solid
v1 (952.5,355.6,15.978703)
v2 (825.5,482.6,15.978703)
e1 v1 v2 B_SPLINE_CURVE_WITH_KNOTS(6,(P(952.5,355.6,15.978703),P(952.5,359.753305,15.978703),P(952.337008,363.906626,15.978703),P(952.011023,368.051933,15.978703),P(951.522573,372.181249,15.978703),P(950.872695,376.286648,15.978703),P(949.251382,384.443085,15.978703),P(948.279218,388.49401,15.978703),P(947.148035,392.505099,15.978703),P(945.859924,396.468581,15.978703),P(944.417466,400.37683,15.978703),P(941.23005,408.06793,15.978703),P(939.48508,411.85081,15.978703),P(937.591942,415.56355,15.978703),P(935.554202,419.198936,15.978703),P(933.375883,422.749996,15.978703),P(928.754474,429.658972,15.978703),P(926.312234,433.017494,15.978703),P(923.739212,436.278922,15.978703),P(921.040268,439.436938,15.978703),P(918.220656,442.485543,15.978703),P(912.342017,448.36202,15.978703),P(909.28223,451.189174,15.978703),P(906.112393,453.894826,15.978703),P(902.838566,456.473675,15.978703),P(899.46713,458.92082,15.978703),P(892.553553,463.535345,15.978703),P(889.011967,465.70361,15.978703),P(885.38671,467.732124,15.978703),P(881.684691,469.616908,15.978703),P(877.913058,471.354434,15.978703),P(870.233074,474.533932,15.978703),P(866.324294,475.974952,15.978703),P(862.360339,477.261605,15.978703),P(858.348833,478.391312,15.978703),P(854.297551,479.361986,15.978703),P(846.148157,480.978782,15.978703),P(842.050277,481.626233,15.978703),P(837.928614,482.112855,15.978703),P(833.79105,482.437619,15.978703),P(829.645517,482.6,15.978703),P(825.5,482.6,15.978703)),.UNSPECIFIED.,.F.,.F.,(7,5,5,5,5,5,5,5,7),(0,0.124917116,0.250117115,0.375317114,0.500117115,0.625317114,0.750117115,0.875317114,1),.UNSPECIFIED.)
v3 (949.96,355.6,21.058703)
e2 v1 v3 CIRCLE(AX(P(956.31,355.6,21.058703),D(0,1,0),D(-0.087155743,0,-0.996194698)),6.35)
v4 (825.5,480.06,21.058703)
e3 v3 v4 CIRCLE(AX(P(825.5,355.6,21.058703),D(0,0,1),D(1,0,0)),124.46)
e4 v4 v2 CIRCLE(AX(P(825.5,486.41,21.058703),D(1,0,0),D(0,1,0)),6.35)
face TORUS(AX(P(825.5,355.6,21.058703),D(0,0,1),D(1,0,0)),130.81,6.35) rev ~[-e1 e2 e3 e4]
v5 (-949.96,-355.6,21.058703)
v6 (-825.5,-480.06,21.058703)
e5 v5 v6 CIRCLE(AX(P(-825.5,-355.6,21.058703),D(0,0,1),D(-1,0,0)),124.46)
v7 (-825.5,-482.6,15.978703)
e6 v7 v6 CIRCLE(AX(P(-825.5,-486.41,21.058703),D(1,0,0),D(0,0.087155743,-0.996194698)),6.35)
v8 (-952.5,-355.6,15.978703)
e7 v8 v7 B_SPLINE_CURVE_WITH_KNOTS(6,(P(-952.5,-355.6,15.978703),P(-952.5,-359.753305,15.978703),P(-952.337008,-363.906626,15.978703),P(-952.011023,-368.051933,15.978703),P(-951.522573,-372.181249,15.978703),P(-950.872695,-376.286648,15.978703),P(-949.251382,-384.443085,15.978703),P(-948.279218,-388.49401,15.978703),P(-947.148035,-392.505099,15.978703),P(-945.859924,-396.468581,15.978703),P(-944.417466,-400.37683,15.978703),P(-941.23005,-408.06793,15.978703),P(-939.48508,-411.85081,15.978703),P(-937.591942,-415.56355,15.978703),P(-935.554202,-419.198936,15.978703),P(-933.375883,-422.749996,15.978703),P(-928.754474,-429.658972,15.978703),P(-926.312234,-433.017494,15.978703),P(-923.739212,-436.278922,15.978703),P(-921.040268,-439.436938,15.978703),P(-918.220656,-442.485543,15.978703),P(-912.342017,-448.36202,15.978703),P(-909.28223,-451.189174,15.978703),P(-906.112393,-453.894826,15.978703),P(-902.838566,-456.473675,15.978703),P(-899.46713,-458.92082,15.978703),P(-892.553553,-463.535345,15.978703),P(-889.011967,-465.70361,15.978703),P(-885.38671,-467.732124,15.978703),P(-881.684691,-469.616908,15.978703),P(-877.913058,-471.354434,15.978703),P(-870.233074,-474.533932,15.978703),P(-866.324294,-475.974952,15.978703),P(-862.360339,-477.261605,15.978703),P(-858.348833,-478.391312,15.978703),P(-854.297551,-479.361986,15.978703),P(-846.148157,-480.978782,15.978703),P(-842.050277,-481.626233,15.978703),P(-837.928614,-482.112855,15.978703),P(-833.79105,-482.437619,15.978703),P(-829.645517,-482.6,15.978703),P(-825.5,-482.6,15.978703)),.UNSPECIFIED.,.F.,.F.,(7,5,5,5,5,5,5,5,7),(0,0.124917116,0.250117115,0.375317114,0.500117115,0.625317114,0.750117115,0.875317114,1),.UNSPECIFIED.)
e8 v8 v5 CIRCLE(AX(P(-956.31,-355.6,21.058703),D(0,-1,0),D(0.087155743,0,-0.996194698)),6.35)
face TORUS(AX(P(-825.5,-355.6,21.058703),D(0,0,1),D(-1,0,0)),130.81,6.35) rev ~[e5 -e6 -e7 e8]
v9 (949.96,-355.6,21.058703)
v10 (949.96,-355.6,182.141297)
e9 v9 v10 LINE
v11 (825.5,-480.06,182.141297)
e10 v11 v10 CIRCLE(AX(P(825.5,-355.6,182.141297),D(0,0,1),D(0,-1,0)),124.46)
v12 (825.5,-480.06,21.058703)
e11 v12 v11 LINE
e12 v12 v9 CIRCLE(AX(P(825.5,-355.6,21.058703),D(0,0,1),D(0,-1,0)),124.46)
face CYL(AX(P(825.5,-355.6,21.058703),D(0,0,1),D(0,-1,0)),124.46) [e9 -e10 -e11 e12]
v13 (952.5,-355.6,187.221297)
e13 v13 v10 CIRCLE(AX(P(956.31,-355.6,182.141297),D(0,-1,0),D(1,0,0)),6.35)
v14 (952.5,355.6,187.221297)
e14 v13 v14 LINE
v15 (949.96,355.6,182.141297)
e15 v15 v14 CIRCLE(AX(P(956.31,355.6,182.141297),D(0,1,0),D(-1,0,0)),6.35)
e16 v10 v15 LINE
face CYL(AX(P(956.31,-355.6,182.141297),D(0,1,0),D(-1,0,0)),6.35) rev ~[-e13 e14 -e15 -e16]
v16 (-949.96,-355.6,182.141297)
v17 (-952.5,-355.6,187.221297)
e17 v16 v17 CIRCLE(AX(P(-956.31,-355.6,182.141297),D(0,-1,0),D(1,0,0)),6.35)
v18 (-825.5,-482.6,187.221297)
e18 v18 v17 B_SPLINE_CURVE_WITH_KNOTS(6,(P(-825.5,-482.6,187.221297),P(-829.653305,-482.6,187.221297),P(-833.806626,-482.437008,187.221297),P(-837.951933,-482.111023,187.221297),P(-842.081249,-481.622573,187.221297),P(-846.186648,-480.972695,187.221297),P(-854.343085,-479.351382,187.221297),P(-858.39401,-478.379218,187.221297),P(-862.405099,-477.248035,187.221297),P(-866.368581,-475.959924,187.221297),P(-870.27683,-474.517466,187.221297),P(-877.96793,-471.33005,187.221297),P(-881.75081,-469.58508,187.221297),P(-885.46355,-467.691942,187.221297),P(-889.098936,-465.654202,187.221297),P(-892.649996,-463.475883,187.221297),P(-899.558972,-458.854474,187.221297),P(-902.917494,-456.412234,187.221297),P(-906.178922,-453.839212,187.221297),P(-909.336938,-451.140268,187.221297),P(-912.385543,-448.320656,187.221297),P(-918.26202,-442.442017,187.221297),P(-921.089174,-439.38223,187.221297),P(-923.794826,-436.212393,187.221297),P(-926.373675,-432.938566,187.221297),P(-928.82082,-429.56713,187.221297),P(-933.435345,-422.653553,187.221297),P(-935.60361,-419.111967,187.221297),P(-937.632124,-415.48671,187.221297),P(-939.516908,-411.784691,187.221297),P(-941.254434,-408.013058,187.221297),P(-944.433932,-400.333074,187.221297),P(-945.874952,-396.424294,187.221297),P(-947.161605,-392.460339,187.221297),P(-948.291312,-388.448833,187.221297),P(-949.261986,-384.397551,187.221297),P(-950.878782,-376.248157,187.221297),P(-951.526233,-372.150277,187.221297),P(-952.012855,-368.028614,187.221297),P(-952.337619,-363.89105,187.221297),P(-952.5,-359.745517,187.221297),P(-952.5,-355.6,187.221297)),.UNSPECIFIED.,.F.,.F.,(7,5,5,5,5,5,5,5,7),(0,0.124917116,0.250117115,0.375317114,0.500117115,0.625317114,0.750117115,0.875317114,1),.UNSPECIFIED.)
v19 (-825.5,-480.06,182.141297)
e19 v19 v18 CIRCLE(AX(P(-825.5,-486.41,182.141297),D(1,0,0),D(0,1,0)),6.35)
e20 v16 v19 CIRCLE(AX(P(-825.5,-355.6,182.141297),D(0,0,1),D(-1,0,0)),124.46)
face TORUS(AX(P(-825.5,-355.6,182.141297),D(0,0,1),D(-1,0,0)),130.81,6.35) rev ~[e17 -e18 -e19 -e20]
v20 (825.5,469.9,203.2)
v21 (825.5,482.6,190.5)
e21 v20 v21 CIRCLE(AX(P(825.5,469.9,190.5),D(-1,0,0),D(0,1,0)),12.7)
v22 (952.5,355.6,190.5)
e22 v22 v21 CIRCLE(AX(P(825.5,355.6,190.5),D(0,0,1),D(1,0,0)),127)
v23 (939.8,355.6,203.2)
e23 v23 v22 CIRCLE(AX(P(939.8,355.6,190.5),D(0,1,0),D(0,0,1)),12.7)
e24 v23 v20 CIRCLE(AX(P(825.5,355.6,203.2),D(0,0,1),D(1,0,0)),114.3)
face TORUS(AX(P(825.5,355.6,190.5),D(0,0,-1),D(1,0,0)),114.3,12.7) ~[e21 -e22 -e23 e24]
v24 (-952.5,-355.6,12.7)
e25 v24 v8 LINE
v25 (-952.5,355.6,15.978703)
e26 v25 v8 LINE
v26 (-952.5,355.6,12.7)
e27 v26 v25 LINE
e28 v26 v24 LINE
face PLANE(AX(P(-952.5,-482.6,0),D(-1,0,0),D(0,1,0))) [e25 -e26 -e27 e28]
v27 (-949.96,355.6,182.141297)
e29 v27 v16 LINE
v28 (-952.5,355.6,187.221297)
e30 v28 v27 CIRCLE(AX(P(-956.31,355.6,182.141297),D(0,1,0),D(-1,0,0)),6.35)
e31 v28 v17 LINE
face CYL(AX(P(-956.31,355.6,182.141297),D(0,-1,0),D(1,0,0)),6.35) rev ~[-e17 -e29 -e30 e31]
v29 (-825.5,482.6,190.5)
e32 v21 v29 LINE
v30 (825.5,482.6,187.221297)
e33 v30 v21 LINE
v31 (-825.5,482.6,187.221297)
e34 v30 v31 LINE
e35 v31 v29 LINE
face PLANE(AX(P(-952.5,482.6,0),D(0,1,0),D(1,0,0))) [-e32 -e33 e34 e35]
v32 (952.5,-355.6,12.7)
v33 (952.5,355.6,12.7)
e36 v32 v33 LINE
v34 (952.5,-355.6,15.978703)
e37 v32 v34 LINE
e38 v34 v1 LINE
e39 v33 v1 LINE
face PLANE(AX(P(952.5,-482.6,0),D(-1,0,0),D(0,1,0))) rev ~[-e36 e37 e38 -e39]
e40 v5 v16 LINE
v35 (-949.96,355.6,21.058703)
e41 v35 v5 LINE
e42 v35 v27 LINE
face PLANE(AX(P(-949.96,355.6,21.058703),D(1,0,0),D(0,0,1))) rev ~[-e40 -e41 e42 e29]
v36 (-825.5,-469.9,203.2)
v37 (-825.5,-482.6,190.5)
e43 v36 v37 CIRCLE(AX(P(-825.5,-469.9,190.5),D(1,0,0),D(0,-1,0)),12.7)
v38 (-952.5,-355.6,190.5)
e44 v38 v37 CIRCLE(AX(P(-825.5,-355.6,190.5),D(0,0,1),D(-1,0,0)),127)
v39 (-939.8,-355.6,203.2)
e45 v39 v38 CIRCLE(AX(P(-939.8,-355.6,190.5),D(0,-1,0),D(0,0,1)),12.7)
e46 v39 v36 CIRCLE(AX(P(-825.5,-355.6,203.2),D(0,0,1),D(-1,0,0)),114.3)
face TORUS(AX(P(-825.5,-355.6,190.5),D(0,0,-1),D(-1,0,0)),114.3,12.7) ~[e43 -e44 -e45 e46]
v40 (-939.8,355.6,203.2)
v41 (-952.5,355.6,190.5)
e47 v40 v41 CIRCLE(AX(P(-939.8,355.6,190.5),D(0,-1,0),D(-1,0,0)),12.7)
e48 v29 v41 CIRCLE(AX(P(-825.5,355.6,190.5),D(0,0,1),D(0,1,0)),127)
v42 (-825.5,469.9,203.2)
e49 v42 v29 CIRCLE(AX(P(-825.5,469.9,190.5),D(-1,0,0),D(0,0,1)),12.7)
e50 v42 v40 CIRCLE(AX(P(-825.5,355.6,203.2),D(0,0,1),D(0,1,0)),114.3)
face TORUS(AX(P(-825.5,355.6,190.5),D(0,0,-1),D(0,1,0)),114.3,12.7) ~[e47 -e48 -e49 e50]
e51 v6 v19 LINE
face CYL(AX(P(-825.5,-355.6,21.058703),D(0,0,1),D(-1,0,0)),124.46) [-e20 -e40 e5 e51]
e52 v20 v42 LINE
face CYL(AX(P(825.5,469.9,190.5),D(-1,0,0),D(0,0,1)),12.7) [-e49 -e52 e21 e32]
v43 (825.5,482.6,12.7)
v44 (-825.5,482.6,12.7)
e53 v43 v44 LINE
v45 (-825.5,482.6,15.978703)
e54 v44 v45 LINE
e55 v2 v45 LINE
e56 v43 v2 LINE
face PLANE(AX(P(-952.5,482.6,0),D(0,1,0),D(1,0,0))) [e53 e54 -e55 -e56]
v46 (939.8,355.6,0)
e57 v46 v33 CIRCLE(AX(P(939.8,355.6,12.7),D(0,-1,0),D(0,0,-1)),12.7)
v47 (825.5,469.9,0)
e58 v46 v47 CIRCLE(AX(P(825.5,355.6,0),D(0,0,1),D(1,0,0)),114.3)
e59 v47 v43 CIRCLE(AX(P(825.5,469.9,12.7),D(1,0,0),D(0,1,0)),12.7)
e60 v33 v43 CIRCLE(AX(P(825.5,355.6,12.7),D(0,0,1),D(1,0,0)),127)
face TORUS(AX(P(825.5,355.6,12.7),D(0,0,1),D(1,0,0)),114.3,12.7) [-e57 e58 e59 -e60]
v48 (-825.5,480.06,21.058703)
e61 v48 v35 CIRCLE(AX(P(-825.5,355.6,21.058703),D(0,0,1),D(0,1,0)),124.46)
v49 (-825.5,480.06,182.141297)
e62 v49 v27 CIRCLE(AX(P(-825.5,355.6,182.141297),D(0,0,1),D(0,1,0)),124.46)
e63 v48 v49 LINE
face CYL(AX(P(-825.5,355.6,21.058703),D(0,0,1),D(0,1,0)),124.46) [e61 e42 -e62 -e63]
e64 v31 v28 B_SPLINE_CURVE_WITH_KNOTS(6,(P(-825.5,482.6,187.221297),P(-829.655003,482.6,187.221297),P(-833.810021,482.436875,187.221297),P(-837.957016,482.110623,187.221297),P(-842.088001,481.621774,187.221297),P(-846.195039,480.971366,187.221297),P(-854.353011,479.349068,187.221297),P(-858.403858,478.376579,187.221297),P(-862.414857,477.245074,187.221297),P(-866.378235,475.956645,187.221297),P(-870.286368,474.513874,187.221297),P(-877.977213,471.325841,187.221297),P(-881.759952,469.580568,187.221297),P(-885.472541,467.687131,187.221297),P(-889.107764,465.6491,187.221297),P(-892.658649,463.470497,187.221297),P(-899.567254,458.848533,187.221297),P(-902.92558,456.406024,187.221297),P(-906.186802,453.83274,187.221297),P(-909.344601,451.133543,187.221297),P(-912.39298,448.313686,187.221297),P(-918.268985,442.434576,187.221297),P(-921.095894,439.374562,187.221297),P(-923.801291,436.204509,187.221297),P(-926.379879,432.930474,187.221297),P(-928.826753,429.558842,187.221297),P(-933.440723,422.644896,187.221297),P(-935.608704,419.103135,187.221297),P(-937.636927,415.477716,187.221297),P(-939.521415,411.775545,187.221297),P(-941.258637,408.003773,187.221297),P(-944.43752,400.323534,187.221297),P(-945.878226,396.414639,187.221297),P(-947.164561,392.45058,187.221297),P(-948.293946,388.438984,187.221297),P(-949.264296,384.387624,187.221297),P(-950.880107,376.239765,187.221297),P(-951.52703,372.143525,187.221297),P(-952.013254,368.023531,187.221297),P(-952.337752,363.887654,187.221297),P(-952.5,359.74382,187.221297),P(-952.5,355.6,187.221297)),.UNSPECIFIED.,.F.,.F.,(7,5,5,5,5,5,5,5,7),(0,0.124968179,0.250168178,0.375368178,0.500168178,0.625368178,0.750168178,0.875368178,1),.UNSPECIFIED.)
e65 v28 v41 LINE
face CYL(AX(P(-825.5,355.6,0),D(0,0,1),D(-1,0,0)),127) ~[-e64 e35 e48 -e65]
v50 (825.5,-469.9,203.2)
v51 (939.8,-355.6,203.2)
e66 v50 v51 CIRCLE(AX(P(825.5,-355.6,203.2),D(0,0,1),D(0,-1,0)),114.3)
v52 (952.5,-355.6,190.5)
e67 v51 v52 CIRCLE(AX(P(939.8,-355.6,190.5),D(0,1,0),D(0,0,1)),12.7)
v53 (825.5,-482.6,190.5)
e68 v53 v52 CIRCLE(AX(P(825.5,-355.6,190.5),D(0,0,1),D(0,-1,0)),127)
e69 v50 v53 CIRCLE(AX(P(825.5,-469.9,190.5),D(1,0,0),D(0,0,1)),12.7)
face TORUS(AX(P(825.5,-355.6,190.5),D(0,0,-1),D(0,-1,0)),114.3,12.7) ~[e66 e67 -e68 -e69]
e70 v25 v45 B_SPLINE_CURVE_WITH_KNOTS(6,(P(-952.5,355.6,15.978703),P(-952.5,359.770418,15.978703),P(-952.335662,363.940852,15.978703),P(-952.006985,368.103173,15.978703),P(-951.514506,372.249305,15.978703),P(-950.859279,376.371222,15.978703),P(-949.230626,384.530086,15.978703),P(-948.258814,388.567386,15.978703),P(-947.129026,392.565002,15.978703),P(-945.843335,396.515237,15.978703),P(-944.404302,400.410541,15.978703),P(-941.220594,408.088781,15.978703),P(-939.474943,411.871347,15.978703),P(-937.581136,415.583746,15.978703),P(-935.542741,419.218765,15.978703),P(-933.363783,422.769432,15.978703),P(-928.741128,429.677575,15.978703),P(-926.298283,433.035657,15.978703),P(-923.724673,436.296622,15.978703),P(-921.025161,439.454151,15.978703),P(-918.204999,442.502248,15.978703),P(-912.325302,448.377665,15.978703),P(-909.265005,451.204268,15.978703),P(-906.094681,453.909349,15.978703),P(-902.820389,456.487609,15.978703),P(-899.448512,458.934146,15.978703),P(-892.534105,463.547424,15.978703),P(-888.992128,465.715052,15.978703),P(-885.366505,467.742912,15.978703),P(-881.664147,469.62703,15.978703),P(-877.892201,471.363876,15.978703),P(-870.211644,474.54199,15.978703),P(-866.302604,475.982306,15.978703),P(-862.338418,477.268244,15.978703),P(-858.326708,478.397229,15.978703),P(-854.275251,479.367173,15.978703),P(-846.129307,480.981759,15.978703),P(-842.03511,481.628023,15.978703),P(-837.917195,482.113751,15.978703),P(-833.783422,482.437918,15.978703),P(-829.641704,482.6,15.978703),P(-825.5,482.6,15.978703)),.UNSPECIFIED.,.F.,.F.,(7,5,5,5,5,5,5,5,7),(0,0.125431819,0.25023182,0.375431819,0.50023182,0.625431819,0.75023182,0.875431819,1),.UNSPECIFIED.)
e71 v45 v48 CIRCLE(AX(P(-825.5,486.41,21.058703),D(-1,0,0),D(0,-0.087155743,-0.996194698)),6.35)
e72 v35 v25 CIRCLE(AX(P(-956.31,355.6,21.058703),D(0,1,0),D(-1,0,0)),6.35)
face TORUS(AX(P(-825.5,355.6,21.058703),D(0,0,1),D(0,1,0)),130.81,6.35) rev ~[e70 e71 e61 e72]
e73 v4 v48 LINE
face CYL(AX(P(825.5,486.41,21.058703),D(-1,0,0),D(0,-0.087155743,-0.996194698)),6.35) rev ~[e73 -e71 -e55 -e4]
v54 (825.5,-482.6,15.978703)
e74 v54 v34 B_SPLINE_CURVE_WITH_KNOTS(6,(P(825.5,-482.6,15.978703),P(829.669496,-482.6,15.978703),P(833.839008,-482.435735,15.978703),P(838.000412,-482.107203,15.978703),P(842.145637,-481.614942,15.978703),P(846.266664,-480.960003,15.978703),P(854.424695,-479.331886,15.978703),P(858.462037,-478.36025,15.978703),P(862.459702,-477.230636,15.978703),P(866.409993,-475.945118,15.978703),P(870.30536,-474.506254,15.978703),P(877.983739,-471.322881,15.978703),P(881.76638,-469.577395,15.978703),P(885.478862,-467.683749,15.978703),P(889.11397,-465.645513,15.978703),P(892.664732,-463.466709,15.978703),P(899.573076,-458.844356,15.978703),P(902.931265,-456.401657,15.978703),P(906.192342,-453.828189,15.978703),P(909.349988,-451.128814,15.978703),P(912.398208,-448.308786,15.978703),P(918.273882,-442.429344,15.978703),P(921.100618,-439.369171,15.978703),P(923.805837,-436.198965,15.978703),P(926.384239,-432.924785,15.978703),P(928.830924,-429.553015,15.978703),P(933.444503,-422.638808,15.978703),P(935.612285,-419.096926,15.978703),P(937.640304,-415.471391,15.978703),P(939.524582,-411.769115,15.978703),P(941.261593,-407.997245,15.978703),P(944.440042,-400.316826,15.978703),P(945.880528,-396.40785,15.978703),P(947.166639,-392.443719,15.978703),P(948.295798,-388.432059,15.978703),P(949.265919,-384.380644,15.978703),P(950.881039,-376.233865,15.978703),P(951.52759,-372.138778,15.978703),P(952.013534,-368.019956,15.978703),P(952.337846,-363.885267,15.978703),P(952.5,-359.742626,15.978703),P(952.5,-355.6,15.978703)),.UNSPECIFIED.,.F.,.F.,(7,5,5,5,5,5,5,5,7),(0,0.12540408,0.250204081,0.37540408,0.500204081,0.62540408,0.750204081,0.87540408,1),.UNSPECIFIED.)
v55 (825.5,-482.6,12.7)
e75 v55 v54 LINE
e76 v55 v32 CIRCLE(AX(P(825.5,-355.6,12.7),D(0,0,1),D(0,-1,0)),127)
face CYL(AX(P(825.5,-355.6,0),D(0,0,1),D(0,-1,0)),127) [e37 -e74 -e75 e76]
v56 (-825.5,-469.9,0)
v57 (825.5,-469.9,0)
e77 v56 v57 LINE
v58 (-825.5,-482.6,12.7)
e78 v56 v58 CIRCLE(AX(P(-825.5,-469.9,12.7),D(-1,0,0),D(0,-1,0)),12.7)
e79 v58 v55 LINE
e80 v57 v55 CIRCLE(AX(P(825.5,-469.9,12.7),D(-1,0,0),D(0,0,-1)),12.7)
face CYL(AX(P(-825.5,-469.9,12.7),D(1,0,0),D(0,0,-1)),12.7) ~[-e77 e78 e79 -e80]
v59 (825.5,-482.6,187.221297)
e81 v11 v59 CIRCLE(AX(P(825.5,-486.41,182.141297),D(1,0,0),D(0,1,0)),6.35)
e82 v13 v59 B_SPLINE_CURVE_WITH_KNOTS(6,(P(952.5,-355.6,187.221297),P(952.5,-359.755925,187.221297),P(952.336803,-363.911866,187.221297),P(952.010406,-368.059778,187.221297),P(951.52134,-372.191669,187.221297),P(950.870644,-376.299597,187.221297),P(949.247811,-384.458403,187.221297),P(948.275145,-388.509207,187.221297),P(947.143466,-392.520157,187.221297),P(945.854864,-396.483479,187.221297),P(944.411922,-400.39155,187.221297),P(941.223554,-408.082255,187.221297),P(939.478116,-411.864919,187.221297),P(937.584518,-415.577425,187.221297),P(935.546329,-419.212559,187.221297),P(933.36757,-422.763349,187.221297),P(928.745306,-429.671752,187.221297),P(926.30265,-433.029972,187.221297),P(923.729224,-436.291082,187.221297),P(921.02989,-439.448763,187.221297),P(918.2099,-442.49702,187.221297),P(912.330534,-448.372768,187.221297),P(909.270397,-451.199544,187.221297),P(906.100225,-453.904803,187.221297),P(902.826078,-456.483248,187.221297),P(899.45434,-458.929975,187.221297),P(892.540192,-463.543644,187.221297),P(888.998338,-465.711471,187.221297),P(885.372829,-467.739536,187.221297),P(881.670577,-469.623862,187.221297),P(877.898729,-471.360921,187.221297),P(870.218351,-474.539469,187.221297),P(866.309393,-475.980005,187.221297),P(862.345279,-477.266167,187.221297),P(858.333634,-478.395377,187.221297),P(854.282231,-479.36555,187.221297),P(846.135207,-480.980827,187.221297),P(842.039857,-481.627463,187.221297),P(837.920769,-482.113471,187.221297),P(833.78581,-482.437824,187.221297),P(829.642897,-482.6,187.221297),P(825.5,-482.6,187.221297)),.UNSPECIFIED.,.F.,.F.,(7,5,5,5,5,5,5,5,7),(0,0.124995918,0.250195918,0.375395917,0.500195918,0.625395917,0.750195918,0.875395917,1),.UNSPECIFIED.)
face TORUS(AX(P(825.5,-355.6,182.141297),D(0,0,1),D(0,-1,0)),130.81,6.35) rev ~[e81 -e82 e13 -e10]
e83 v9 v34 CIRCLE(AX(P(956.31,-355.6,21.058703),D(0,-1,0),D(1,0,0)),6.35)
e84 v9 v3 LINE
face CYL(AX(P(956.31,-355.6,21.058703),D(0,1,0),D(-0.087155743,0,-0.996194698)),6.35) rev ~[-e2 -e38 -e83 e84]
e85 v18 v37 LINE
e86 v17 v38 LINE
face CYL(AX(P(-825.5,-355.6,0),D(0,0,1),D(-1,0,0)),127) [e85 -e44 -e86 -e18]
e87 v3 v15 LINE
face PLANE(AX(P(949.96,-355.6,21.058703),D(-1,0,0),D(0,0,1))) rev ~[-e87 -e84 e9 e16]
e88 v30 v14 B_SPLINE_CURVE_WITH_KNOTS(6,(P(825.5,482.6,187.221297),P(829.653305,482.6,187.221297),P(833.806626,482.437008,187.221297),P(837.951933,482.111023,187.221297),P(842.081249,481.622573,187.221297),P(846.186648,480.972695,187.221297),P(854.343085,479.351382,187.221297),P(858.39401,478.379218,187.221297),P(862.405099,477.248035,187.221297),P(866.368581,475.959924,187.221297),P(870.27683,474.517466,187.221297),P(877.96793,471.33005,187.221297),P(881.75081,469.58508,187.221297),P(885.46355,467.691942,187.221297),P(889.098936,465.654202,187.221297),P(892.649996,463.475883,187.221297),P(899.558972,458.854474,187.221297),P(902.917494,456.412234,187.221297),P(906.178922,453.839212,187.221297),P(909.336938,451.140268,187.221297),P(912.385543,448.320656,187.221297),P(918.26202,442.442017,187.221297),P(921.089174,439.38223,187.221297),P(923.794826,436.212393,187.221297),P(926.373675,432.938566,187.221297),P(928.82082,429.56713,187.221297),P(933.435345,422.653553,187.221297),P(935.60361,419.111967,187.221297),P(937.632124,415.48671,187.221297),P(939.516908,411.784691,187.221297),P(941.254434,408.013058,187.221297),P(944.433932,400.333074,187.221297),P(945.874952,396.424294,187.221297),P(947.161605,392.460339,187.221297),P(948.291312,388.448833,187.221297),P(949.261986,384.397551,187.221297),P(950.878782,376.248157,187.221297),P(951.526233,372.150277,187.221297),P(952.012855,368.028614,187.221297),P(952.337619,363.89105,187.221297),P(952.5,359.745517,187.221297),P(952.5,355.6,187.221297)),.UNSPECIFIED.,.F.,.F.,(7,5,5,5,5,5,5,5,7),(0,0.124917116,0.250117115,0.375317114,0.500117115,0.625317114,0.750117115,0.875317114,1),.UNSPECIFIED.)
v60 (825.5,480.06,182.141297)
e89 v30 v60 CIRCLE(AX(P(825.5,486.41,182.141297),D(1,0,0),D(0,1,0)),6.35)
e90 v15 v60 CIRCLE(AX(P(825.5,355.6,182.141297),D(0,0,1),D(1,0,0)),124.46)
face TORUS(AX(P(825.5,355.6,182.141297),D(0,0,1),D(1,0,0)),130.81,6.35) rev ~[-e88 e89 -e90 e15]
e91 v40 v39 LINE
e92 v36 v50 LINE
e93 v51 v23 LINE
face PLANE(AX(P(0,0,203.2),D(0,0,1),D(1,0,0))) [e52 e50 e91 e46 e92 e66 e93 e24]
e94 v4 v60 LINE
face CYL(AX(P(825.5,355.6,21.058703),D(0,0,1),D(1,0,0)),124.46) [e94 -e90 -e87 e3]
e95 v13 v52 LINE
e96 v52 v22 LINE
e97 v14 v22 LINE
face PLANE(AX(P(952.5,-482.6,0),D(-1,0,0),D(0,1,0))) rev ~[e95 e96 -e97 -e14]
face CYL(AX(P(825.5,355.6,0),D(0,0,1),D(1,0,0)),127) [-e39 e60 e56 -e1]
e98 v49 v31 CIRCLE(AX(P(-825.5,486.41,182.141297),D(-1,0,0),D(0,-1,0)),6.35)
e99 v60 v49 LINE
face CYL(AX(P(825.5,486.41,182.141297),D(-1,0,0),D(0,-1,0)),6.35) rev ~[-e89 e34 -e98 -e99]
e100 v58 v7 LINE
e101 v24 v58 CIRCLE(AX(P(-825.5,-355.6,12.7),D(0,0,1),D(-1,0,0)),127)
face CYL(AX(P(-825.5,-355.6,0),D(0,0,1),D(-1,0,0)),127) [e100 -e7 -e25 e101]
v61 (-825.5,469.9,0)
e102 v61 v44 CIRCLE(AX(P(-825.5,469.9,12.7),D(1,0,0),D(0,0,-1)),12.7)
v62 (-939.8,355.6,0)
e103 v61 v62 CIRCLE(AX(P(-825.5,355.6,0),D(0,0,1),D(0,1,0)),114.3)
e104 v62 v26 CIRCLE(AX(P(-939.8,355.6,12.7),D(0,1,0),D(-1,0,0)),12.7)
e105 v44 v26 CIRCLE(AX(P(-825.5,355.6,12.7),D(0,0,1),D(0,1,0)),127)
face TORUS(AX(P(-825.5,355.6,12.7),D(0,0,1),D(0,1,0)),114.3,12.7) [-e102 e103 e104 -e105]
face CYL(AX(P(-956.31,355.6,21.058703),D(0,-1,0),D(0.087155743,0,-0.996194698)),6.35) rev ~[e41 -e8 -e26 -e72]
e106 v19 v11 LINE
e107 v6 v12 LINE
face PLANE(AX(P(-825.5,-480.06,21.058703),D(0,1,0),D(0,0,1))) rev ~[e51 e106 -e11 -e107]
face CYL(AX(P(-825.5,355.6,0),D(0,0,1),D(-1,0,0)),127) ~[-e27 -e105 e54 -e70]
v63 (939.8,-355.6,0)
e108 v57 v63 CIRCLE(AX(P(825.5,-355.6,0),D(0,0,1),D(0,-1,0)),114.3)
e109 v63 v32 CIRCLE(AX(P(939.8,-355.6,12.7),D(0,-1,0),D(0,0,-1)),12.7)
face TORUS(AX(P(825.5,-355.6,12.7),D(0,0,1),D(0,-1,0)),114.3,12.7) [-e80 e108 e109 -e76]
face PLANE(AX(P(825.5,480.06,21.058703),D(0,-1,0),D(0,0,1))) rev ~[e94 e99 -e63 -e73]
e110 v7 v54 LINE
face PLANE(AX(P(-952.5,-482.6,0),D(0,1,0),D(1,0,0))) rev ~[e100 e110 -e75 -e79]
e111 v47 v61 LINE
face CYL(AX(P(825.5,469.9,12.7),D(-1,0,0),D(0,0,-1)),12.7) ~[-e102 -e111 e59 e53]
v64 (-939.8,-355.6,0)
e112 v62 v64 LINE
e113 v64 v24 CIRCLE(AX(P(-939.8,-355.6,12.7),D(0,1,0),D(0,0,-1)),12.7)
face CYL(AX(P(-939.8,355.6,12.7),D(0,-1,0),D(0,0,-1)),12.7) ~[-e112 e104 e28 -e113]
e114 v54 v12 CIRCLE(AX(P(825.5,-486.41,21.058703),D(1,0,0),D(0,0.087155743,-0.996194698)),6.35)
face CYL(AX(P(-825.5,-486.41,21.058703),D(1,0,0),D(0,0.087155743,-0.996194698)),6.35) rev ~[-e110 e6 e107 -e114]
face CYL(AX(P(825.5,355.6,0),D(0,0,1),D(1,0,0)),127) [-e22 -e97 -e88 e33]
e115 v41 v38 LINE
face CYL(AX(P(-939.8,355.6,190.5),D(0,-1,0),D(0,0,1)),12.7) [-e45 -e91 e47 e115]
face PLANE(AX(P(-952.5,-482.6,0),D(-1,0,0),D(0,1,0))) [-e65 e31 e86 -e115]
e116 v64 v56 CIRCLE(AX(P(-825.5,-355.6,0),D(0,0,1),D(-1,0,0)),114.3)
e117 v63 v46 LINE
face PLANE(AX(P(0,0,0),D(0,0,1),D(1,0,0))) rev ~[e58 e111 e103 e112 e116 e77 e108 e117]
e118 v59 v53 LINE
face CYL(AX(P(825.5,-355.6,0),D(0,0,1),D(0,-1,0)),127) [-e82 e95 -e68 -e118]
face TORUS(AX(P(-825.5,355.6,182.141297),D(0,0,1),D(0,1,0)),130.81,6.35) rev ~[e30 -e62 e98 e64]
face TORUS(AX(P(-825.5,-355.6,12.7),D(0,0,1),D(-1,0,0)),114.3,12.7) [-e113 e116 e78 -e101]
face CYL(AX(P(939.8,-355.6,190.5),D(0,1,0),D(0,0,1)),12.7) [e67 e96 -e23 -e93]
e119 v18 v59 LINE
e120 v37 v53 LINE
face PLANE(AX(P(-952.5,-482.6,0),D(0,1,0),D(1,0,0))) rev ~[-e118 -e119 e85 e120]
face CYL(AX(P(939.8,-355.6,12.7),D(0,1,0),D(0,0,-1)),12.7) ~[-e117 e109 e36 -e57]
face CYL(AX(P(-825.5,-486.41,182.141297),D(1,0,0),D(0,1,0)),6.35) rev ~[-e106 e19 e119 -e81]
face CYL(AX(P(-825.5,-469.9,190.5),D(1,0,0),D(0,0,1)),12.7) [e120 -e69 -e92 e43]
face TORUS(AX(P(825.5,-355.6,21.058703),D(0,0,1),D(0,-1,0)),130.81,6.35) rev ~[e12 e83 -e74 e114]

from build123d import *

# Parameters (mm, degrees)
F0_W     = 1905
F0_H     = 965.2
F1_DEPTH = 203.2
F2_R     = 127
F3_R     = 12.7


with BuildPart() as f1:
    # F0 (on Top) → F1 (new body)
    with BuildSketch(Plane.XY):
        Rectangle(F0_W, F0_H)
    extrude(amount=F1_DEPTH)

    # F2
    f2_edges = [f1.edges().sort_by_distance(p)[0] for p in [
        (952.5, -482.6, 101.6),
        (-952.5, -482.6, 101.6),
        (952.5, 482.6, 101.6),
        (-952.5, 482.6, 101.6),
    ]]
    fillet(f2_edges, radius=F2_R)

    # F3
    f3_edges = [f1.edges().sort_by_distance(p)[0] for p in [
        (952.5, 0, 203.2),
        (915.302561, -445.402561, 203.2),
        (915.302561, 445.402561, 203.2),
        (0, -482.6, 203.2),
        (0, 482.6, 203.2),
        (-915.302561, -445.402561, 203.2),
        (-915.302561, 445.402561, 203.2),
        (-952.5, 0, 203.2),
        (952.5, 0, 0),
        (915.302561, -445.402561, 0),
        (915.302561, 445.402561, 0),
        (0, -482.6, 0),
        (0, 482.6, 0),
        (-915.302561, -445.402561, 0),
        (-915.302561, 445.402561, 0),
        (-952.5, 0, 0),
    ]]
    fillet(f3_edges, radius=F3_R)

    # F7: sweep along a path in F7_path
    with BuildLine(Plane(origin=(-825.5, -482.6, 190.5), x_dir=(0, 1, 0), z_dir=(0, 0, 1))) as f7_path:
        Line((0, 0), (0, -1651))
        ThreePointArc((0, -1651), (37.1974387893, -1740.8025612107), (127, -1778))
        Line((127, -1778), (838.2, -1778))
        ThreePointArc((838.2, -1778), (928.0025612107, -1740.8025612107), (965.2, -1651))
        Line((965.2, -1651), (965.2, 0))
        ThreePointArc((965.2, 0), (928.0025612107, 89.8025612107), (838.2, 127))
        Line((838.2, 127), (127, 127))
        ThreePointArc((127, 127), (37.1974387893, 89.8025612107), (0, 0))
    # F5 (on face) → F7 (sweep, cut)
    with BuildSketch(Plane.YZ.offset(825.5)):
        with BuildLine():
            Line((-480.06, 21.058702955), (-480.06, 182.141297045))
            ThreePointArc((-480.06, 182.141297045), (-481.7282889113, 186.4312948633), (-485.8565610336, 188.4671333779))
            Line((-485.8565610336, 188.4671333779), (-553.3473393859, 194.3718113762))
            Line((-553.3473393859, 194.3718113762), (-553.3473393859, 8.8281886238))
            Line((-553.3473393859, 8.8281886238), (-485.8565610336, 14.7328666221))
            ThreePointArc((-485.8565610336, 14.7328666221), (-481.7282889113, 16.7687051367), (-480.06, 21.058702955))
        make_face()
    sweep(path=f7_path.line, mode=Mode.SUBTRACT)


solid = f1.part
